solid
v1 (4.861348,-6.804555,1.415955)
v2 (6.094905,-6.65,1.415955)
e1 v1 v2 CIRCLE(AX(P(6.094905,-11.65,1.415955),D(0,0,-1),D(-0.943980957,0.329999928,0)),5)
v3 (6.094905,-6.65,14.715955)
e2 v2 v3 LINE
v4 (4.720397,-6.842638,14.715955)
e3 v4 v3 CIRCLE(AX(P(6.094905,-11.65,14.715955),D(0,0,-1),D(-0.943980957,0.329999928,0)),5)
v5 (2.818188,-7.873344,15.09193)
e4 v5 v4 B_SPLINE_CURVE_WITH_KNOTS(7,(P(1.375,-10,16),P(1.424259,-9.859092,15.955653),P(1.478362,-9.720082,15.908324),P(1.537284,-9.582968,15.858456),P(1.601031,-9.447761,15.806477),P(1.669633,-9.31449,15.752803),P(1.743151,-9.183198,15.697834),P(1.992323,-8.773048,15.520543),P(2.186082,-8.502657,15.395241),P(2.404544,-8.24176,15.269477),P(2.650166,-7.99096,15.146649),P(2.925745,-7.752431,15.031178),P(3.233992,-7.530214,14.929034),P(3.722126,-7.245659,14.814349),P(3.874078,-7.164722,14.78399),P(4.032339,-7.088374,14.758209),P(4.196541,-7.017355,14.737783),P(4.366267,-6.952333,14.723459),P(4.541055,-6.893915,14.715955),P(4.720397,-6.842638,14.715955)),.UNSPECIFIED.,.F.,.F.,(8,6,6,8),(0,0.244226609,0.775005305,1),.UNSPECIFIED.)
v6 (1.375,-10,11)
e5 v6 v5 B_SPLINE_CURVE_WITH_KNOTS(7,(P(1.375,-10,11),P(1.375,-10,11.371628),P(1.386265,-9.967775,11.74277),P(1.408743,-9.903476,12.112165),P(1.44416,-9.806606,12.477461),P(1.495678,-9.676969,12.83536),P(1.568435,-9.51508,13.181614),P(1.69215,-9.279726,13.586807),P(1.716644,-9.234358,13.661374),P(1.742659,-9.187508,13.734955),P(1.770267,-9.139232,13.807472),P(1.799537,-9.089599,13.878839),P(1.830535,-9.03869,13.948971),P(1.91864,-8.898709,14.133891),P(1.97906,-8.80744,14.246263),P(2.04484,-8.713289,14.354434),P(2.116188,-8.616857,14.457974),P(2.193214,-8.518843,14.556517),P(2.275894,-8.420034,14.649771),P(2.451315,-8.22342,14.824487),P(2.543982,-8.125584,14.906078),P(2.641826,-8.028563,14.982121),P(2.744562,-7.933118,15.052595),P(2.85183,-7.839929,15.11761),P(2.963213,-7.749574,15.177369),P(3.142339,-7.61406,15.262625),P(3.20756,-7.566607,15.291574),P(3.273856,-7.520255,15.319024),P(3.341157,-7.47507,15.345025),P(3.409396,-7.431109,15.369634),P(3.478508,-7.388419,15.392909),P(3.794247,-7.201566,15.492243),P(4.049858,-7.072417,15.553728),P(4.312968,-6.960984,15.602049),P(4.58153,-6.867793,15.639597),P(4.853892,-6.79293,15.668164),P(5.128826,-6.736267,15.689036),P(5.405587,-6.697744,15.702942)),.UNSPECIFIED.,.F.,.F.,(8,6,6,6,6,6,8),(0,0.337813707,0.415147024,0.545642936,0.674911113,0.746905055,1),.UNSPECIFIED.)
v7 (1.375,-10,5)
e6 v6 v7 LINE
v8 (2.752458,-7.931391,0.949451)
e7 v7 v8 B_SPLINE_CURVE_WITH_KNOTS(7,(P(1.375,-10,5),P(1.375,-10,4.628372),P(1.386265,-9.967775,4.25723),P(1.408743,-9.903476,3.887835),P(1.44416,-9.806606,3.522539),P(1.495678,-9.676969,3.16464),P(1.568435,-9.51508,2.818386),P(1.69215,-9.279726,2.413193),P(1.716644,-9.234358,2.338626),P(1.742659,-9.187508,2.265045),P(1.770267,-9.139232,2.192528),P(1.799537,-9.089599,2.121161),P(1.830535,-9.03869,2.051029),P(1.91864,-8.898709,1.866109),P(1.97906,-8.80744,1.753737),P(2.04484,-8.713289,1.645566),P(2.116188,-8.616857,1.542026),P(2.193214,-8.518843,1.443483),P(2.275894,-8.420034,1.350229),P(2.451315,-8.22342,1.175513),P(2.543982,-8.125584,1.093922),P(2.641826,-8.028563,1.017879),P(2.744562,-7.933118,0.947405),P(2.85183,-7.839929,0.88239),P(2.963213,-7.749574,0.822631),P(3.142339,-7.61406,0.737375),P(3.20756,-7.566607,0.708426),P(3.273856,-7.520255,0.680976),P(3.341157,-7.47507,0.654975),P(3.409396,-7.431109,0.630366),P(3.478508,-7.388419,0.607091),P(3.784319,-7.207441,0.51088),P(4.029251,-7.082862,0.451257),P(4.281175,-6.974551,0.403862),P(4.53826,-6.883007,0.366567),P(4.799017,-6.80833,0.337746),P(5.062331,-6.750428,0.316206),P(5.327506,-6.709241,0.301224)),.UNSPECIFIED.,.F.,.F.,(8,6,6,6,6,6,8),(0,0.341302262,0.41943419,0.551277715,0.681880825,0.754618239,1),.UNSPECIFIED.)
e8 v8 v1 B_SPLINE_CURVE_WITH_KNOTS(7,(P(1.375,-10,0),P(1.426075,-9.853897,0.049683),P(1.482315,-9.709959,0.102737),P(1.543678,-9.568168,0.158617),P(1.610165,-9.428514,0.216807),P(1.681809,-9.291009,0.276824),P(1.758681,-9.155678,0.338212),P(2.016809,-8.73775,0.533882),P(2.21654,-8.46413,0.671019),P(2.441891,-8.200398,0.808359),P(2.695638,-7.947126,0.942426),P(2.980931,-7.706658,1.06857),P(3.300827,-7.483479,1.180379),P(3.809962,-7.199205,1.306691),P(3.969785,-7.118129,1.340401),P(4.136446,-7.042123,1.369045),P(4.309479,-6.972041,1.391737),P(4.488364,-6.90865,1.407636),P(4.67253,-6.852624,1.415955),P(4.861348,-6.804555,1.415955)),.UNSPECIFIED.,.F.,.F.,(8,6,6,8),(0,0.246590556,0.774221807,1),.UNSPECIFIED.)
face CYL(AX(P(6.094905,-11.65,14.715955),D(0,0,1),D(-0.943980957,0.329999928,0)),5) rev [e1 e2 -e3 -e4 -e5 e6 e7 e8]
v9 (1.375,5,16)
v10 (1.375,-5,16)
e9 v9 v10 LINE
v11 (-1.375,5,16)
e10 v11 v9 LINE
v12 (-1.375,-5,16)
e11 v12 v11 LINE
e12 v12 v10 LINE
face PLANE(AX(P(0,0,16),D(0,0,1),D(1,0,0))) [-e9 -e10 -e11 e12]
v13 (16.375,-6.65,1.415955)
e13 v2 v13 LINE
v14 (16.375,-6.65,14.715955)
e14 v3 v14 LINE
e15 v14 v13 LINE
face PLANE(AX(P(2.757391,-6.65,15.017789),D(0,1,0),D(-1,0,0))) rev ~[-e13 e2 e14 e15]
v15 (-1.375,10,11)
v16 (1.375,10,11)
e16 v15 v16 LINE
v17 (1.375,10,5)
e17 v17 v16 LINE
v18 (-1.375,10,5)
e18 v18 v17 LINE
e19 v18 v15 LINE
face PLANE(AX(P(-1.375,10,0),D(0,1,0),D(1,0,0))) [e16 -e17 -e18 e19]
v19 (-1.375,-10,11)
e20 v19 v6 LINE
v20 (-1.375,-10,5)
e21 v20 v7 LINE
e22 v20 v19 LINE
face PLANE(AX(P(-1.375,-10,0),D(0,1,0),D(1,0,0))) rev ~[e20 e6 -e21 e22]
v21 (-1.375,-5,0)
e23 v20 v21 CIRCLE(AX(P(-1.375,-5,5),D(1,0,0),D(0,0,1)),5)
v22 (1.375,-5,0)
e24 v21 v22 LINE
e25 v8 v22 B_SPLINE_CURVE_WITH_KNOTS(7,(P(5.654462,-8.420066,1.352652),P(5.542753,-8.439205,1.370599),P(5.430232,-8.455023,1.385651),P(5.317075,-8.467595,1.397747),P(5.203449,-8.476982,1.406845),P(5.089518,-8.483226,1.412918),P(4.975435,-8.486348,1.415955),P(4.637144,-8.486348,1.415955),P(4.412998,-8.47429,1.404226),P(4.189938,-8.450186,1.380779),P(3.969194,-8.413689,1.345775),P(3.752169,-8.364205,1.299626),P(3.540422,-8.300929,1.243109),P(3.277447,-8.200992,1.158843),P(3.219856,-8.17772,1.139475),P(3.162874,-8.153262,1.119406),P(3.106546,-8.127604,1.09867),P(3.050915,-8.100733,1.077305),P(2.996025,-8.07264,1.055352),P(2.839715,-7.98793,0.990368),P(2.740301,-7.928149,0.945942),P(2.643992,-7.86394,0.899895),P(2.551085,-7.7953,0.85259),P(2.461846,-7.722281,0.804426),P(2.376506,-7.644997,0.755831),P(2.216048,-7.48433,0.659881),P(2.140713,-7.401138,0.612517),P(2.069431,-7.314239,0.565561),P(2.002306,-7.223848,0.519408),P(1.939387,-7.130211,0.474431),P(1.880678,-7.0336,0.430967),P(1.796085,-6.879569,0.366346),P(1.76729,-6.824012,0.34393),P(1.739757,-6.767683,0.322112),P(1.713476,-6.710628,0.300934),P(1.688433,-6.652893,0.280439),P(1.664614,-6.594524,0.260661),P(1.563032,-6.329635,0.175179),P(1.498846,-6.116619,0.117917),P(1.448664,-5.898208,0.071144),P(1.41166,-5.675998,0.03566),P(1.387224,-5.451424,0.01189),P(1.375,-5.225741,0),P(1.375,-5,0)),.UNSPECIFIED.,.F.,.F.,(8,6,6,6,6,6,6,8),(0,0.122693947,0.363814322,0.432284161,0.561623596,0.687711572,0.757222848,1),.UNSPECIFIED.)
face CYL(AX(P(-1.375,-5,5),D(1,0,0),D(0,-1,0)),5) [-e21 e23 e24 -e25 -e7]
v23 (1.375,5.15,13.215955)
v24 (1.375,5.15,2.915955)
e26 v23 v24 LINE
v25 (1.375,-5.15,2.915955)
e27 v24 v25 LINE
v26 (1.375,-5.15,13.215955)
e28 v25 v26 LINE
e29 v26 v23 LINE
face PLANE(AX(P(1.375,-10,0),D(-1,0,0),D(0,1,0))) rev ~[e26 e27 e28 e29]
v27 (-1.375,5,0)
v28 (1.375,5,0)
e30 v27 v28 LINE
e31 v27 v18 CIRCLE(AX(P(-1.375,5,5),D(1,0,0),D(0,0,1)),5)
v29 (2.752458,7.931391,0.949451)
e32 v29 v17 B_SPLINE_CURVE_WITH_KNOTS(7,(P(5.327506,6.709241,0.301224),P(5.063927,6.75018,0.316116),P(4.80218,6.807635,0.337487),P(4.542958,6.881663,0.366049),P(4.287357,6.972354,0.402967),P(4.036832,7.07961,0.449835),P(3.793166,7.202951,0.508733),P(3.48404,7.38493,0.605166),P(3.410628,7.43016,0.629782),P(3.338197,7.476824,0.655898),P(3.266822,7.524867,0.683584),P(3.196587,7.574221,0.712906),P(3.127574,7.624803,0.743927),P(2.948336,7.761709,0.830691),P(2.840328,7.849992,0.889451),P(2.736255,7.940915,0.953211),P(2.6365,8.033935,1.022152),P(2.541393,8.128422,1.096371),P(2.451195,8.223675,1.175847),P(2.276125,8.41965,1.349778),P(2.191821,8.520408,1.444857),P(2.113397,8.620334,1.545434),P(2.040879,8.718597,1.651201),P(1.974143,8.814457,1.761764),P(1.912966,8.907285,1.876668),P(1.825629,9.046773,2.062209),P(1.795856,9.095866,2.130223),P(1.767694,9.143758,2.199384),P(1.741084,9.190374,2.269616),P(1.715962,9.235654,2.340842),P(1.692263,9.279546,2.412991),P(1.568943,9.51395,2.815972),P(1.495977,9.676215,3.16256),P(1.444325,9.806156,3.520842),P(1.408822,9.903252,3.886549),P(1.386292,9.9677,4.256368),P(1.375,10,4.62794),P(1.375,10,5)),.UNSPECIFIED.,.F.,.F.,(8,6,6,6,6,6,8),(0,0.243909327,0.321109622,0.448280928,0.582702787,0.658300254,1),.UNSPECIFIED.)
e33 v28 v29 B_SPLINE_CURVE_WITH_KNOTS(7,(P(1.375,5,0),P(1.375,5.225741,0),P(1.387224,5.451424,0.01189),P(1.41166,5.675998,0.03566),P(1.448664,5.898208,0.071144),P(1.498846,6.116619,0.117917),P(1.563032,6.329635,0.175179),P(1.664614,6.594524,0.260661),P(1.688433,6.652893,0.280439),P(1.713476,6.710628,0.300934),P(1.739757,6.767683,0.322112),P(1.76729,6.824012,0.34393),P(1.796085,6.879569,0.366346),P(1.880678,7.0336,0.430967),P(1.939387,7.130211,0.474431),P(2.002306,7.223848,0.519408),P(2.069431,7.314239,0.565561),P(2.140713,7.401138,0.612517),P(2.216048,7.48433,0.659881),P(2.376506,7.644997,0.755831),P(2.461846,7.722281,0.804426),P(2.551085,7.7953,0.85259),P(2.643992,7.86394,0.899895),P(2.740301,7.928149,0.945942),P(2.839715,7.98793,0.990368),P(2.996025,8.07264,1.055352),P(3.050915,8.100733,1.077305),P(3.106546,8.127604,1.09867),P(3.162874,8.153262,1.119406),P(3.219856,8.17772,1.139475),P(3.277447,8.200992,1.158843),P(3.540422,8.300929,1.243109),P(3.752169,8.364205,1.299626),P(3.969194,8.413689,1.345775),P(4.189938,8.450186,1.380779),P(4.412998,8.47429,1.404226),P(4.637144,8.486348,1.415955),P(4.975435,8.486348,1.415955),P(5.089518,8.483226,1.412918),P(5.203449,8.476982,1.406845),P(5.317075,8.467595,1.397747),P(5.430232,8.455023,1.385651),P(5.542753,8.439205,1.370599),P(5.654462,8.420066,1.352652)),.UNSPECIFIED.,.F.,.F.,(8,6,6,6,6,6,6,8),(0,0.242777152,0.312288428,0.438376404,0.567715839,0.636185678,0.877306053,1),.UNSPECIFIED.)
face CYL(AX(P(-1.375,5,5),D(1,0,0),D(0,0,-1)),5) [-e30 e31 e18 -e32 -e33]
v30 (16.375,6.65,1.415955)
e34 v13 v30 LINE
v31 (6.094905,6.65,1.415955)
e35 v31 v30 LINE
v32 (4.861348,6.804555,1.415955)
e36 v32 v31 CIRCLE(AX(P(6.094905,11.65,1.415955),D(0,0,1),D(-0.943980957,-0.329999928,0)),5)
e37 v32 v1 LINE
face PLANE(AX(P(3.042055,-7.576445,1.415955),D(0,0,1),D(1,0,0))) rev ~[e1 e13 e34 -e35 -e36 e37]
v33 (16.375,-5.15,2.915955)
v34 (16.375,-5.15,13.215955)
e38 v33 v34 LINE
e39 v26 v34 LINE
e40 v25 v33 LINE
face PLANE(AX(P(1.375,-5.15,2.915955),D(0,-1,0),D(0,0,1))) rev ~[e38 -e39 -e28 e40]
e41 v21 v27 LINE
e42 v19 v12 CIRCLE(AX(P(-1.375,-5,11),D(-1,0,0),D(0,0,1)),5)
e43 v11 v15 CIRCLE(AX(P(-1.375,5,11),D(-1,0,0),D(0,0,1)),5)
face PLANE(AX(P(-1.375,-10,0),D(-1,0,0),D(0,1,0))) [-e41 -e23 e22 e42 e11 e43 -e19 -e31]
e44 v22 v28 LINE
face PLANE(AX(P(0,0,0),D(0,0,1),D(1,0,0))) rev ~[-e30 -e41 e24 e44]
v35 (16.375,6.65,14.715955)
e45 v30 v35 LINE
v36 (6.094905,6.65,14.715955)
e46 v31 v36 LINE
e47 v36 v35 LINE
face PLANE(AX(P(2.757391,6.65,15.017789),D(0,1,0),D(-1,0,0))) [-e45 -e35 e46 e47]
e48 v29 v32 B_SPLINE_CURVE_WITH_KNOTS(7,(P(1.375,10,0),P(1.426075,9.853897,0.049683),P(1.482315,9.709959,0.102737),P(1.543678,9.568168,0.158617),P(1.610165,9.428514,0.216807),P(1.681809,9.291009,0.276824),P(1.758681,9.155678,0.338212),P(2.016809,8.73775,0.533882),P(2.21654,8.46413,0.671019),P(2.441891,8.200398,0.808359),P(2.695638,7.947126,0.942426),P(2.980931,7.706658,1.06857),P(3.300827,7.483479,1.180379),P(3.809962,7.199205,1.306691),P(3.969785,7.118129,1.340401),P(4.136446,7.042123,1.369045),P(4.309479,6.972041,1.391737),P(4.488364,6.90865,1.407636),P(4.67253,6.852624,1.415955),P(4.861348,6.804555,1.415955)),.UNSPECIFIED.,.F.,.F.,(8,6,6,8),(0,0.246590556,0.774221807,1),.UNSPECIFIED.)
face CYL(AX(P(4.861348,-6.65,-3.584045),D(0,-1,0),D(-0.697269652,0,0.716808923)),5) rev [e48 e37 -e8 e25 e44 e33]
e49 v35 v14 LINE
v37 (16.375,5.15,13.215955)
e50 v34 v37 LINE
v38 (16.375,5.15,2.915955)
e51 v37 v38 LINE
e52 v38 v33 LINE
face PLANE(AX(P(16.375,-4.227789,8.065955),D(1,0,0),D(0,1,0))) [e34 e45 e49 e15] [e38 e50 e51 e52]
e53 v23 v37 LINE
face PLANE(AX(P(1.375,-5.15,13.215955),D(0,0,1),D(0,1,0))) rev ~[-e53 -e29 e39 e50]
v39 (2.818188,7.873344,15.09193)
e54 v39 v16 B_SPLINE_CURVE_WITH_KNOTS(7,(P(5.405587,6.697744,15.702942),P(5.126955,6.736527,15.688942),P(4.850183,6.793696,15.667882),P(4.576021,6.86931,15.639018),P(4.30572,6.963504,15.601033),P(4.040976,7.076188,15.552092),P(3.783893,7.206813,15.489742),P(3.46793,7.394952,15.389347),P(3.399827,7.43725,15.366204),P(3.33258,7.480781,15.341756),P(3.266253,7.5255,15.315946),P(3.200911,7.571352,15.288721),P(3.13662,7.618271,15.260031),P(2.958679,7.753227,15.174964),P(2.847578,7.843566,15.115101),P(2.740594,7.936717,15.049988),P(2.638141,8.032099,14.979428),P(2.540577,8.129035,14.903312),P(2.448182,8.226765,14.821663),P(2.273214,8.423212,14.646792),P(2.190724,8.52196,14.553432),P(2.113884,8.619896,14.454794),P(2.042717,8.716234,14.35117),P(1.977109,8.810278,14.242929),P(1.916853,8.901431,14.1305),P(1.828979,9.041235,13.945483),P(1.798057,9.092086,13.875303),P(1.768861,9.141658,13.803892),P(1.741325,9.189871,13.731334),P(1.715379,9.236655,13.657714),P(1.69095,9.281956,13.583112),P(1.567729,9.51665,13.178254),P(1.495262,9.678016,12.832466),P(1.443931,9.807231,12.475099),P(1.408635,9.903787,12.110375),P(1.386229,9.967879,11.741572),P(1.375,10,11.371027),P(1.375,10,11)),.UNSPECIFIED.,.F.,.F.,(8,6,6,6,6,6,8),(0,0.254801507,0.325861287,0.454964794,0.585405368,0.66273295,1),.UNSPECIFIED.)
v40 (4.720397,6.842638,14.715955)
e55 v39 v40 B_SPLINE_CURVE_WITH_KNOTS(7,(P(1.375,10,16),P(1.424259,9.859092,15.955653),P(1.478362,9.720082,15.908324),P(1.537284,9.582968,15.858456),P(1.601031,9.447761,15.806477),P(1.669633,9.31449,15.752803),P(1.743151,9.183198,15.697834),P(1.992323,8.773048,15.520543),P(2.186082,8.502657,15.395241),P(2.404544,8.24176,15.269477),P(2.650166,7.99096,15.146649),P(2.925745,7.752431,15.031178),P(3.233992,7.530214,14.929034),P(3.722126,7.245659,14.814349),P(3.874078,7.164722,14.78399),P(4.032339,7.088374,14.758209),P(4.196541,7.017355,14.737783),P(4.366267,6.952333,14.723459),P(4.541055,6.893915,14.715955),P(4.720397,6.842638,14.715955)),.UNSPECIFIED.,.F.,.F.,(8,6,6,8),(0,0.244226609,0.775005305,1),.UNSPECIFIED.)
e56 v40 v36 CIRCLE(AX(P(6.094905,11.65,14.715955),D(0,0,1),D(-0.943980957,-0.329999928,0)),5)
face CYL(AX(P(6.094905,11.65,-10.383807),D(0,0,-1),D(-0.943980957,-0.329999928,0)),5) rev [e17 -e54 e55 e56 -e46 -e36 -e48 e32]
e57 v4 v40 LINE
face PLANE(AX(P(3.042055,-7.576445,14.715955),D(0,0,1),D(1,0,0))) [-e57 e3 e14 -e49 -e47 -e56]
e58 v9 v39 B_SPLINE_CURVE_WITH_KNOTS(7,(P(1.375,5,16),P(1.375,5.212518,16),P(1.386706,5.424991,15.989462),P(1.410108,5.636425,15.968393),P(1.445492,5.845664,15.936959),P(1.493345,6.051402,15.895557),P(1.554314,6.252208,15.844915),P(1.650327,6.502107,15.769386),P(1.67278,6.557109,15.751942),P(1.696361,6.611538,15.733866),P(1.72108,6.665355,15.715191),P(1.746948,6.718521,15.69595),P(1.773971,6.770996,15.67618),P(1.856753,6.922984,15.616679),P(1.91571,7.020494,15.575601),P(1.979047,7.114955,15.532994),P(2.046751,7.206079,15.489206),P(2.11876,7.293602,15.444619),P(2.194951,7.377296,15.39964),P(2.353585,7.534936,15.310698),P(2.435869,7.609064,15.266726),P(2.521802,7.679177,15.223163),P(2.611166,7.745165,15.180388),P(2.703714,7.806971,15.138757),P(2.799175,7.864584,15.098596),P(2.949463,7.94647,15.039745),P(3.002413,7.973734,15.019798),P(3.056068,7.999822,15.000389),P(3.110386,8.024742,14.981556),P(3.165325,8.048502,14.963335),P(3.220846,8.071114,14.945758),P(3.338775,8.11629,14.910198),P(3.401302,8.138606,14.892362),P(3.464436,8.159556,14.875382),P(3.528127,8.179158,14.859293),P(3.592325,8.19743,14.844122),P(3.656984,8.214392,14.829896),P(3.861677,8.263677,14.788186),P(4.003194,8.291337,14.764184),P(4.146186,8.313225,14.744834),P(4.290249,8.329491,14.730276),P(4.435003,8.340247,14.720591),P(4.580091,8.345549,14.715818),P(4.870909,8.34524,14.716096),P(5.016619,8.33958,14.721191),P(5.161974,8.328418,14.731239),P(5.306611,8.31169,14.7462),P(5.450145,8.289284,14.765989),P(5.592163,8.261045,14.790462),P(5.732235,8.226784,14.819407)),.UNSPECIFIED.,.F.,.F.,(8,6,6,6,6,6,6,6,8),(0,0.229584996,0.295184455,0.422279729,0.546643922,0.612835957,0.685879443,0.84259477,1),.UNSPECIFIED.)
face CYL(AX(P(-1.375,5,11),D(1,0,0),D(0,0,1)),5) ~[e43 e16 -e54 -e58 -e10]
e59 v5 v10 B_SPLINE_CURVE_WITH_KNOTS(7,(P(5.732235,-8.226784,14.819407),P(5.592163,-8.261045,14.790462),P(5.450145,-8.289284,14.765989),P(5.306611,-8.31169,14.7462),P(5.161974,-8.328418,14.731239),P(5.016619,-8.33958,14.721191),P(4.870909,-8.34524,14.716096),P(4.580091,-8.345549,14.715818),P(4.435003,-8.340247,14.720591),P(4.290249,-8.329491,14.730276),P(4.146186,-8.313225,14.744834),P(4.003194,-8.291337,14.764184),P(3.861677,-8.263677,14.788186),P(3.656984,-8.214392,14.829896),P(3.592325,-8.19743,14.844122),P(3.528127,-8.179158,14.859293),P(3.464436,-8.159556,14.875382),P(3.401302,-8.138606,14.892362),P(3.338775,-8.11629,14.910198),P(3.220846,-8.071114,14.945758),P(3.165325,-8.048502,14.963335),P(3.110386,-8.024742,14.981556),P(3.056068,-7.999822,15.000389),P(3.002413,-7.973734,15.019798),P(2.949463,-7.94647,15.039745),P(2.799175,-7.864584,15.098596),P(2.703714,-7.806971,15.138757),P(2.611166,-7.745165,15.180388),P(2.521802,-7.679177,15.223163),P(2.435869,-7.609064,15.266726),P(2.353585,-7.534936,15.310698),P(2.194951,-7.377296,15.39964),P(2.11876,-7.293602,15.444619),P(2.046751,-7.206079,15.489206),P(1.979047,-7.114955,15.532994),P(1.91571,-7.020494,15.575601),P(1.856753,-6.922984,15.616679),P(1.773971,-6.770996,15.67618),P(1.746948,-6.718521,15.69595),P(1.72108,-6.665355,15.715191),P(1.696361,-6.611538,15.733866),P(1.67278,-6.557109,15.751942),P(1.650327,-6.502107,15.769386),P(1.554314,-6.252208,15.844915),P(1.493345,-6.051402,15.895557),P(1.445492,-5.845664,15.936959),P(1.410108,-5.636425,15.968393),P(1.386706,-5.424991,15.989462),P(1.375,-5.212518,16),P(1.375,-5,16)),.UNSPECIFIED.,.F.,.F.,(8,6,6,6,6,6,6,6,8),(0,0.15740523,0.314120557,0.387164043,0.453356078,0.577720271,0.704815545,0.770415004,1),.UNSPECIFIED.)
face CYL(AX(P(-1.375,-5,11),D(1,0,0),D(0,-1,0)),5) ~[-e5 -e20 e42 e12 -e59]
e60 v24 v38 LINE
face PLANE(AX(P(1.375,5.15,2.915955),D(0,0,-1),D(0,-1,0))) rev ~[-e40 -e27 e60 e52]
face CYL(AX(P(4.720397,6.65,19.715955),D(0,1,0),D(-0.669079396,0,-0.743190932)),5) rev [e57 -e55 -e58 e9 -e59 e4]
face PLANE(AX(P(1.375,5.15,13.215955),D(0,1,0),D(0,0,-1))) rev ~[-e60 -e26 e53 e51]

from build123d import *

# Parameters (mm, degrees)
F0_W         = 2.75
F0_H         = 20
F1_DEPTH     = 16
F2_W         = 5.15
F2_H         = 10.3
F3_DEPTH     = 2.75
F4_DEPTH     = 15
F5_T1_DEPTH  = 13.2999992773
F5_T3_DEPTH  = 13.2999992773
F5_T9_DEPTH  = 21.6634917276
F5_T14_DEPTH = 25.0997612432
F5_T22_DEPTH = 21.6634917276
F5_T27_DEPTH = 25.0997612432
F5_T35_DEPTH = 22.0158699277
F5_T40_DEPTH = 25.0997612432
F5_T48_DEPTH = 25.0997612432
F5_T53_DEPTH = 22.0158699277
F6_R         = 5


# Not quite as in the source:
# - a fillet or chamfer that OpenCascade refuses, or shapes differently, is made with other operations: its cross-section is extruded or revolved along the edge and cut away or added
# - a feature names something its author has since deleted; it is built from what else it names


with BuildPart() as f1:
    # F0 (on Top) → F1 (new body)
    with BuildSketch(Plane.XY):
        Rectangle(F0_W, F0_H)
    extrude(amount=F1_DEPTH)

    # F2 (on face) → F3 (join)
    with BuildSketch(Plane.YZ.offset(1.375)):
        Polygon((0, 16), (-10, 16), (-10, 0), (0, 0), (0, 1.4159553841), (-6.6499996386, 1.4159553841), (-6.6499996386, 14.7159546614), (0, 14.7159546614), align=None)
        Polygon((10, 16), (0, 16), (0, 14.7159546614), (6.6499996386, 14.7159546614), (6.6499996386, 1.4159553841), (0, 1.4159553841), (0, 0), (10, 0), align=None)
        with Locations((-2.575, 8.0659550227)):
            Rectangle(F2_W, F2_H)
        with Locations((2.575, 8.0659550227)):
            Rectangle(F2_W, F2_H)
        Polygon((0, 13.2159550227), (0, 14.7159546614), (-6.6499996386, 14.7159546614), (-6.6499996386, 1.4159553841), (0, 1.4159553841), (0, 2.9159550227), (-5.15, 2.9159550227), (-5.15, 13.2159550227), align=None)
        Polygon((6.6499996386, 14.7159546614), (0, 14.7159546614), (0, 13.2159550227), (5.15, 13.2159550227), (5.15, 2.9159550227), (0, 2.9159550227), (0, 1.4159553841), (6.6499996386, 1.4159553841), align=None)
    extrude(amount=-F3_DEPTH)

    # F2 (on face) → F4 (join)
    with BuildSketch(Plane.YZ.offset(1.375)):
        Polygon((0, 13.2159550227), (0, 14.7159546614), (-6.6499996386, 14.7159546614), (-6.6499996386, 1.4159553841), (0, 1.4159553841), (0, 2.9159550227), (-5.15, 2.9159550227), (-5.15, 13.2159550227), align=None)
        Polygon((6.6499996386, 14.7159546614), (0, 14.7159546614), (0, 13.2159550227), (5.15, 13.2159550227), (5.15, 2.9159550227), (0, 2.9159550227), (0, 1.4159553841), (6.6499996386, 1.4159553841), align=None)
    extrude(amount=F4_DEPTH)

    # F5: fillet of radius 5 on 6 edges, made by hand

    # F5_s2 → F5_t1 (join)
    with BuildSketch(Plane.XZ.offset(-6.6499996386)):
        with BuildLine():
            ThreePointArc((1.375, 16), (2.9287180617, 15.0479907955), (4.7203969801, 14.7159546614))
            Line((4.7203969801, 14.7159546614), (1.375, 14.7159546614))
            Line((1.375, 14.7159546614), (1.375, 16))
        make_face()
        with BuildLine():
            ThreePointArc((1.375, 0), (2.9798891295, 1.0484613517), (4.8613482602, 1.4159553841))
            Line((4.8613482602, 1.4159553841), (1.375, 1.4159553841))
            Line((1.375, 1.4159553841), (1.375, 0))
        make_face()
    extrude(amount=F5_T1_DEPTH)

    # F5_s4 → F5_t3 (join)
    with BuildSketch(Plane.XY.offset(1.4159553841)):
        with BuildLine():
            ThreePointArc((1.375, -10), (3.2009454046, -7.5726231419), (6.0949047864, -6.6499996386))
            Line((6.0949047864, -6.6499996386), (1.375, -6.6499996386))
            Line((1.375, -6.6499996386), (1.375, -10))
        make_face()
        with BuildLine():
            ThreePointArc((1.375, 10), (3.2009454046, 7.5726231419), (6.0949047864, 6.6499996386))
            Line((6.0949047864, 6.6499996386), (1.375, 6.6499996386))
            Line((1.375, 6.6499996386), (1.375, 10))
        make_face()
    extrude(amount=F5_T3_DEPTH)


with BuildPart() as f5_tool7:
    # F5_s8 → F5_t9 (new body)
    with BuildSketch(Plane.XZ.offset(-15.013492089)):
        with BuildLine():
            ThreePointArc((1.375, 16), (2.9287180617, 15.0479907955), (4.7203969801, 14.7159546614))
            Line((4.7203969801, 14.7159546614), (1.375, 14.7159546614))
            Line((1.375, 14.7159546614), (1.375, 16))
        make_face()
    extrude(amount=F5_T9_DEPTH)

    split(bisect_by=Plane.XZ.offset(-10), keep=Keep.TOP)

    split(bisect_by=Plane.XZ.offset(-6.6499996386), keep=Keep.BOTTOM)


with BuildPart() as f5_tool12:
    # F5_s13 → F5_t14 (new body)
    with BuildSketch(Plane.XY.offset(1.4159553841)):
        with BuildLine():
            ThreePointArc((1.375, 10), (3.2009454046, 7.5726231419), (6.0949047864, 6.6499996386))
            Line((6.0949047864, 6.6499996386), (1.375, 6.6499996386))
            Line((1.375, 6.6499996386), (1.375, 10))
        make_face()
    extrude(amount=F5_T14_DEPTH)

    split(bisect_by=Plane.XY.offset(16), keep=Keep.BOTTOM)

    split(bisect_by=Plane.XY.offset(14.7159546614), keep=Keep.TOP)


with BuildPart() as f5_tool7_1:
    add(f5_tool7.part)

    # F5_t17: intersect F5_tool12
    add(f5_tool12.part, mode=Mode.INTERSECT)


with BuildPart() as f1_1:
    add(f1.part)

    # F5_t5: union F5_tool7
    add(f5_tool7_1.part)


with BuildPart() as f5_tool20:
    # F5_s21 → F5_t22 (new body)
    with BuildSketch(Plane.XZ.offset(-6.6499996386)):
        with BuildLine():
            ThreePointArc((1.375, 16), (2.9287180617, 15.0479907955), (4.7203969801, 14.7159546614))
            Line((4.7203969801, 14.7159546614), (1.375, 14.7159546614))
            Line((1.375, 14.7159546614), (1.375, 16))
        make_face()
    extrude(amount=F5_T22_DEPTH)

    split(bisect_by=Plane.XZ.offset(10), keep=Keep.BOTTOM)

    split(bisect_by=Plane.XZ.offset(6.6499996386), keep=Keep.TOP)


with BuildPart() as f5_tool25:
    # F5_s26 → F5_t27 (new body)
    with BuildSketch(Plane.XY.offset(26.5157166273)):
        with BuildLine():
            ThreePointArc((1.375, -10), (3.2009454046, -7.5726231419), (6.0949047864, -6.6499996386))
            Line((6.0949047864, -6.6499996386), (1.375, -6.6499996386))
            Line((1.375, -6.6499996386), (1.375, -10))
        make_face()
    extrude(amount=-F5_T27_DEPTH)

    split(bisect_by=Plane.XY.offset(16), keep=Keep.BOTTOM)

    split(bisect_by=Plane.XY.offset(14.7159546614), keep=Keep.TOP)


with BuildPart() as f5_tool20_1:
    add(f5_tool20.part)

    # F5_t30: intersect F5_tool25
    add(f5_tool25.part, mode=Mode.INTERSECT)


with BuildPart() as f1_2:
    add(f1_1.part)

    # F5_t18: union F5_tool20
    add(f5_tool20_1.part)


with BuildPart() as f5_tool33:
    # F5_s34 → F5_t35 (new body)
    with BuildSketch(Plane.XZ.offset(15.365870289)):
        with BuildLine():
            ThreePointArc((1.375, 0), (2.9798891295, 1.0484613517), (4.8613482602, 1.4159553841))
            Line((4.8613482602, 1.4159553841), (1.375, 1.4159553841))
            Line((1.375, 1.4159553841), (1.375, 0))
        make_face()
    extrude(amount=-F5_T35_DEPTH)

    split(bisect_by=Plane.XZ.offset(10), keep=Keep.BOTTOM)

    split(bisect_by=Plane.XZ.offset(6.6499996386), keep=Keep.TOP)


with BuildPart() as f5_tool38:
    # F5_s39 → F5_t40 (new body)
    with BuildSketch(Plane.XY.offset(14.7159546614)):
        with BuildLine():
            ThreePointArc((1.375, -10), (3.2009454046, -7.5726231419), (6.0949047864, -6.6499996386))
            Line((6.0949047864, -6.6499996386), (1.375, -6.6499996386))
            Line((1.375, -6.6499996386), (1.375, -10))
        make_face()
    extrude(amount=-F5_T40_DEPTH)

    split(bisect_by=Plane.XY, keep=Keep.TOP)

    split(bisect_by=Plane.XY.offset(1.4159553841), keep=Keep.BOTTOM)


with BuildPart() as f5_tool33_1:
    add(f5_tool33.part)

    # F5_t43: intersect F5_tool38
    add(f5_tool38.part, mode=Mode.INTERSECT)


with BuildPart() as f1_3:
    add(f1_2.part)

    # F5_t31: union F5_tool33
    add(f5_tool33_1.part)


with BuildPart() as f5_tool46:
    # F5_s47 → F5_t48 (new body)
    with BuildSketch(Plane.XY.offset(-10.3838065819)):
        with BuildLine():
            ThreePointArc((1.375, 10), (3.2009454046, 7.5726231419), (6.0949047864, 6.6499996386))
            Line((6.0949047864, 6.6499996386), (1.375, 6.6499996386))
            Line((1.375, 6.6499996386), (1.375, 10))
        make_face()
    extrude(amount=F5_T48_DEPTH)

    split(bisect_by=Plane.XY, keep=Keep.TOP)

    split(bisect_by=Plane.XY.offset(1.4159553841), keep=Keep.BOTTOM)


with BuildPart() as f5_tool51:
    # F5_s52 → F5_t53 (new body)
    with BuildSketch(Plane.XZ.offset(6.6499996386)):
        with BuildLine():
            ThreePointArc((1.375, 0), (2.9798891295, 1.0484613517), (4.8613482602, 1.4159553841))
            Line((4.8613482602, 1.4159553841), (1.375, 1.4159553841))
            Line((1.375, 1.4159553841), (1.375, 0))
        make_face()
    extrude(amount=-F5_T53_DEPTH)

    split(bisect_by=Plane.XZ.offset(-10), keep=Keep.TOP)

    split(bisect_by=Plane.XZ.offset(-6.6499996386), keep=Keep.BOTTOM)


with BuildPart() as f5_tool46_1:
    add(f5_tool46.part)

    # F5_t56: intersect F5_tool51
    add(f5_tool51.part, mode=Mode.INTERSECT)


with BuildPart() as f1_4:
    add(f1_3.part)

    # F5_t44: union F5_tool46
    add(f5_tool46_1.part)

    # F6
    f6_edges = [f1_4.edges().sort_by_distance(p)[0] for p in [
        (0, -10, 0),
        (0, -10, 16),
        (0, 10, 16),
        (0, 10, 0),
    ]]
    fillet(f6_edges, radius=F6_R)


solid = f1_4.part
